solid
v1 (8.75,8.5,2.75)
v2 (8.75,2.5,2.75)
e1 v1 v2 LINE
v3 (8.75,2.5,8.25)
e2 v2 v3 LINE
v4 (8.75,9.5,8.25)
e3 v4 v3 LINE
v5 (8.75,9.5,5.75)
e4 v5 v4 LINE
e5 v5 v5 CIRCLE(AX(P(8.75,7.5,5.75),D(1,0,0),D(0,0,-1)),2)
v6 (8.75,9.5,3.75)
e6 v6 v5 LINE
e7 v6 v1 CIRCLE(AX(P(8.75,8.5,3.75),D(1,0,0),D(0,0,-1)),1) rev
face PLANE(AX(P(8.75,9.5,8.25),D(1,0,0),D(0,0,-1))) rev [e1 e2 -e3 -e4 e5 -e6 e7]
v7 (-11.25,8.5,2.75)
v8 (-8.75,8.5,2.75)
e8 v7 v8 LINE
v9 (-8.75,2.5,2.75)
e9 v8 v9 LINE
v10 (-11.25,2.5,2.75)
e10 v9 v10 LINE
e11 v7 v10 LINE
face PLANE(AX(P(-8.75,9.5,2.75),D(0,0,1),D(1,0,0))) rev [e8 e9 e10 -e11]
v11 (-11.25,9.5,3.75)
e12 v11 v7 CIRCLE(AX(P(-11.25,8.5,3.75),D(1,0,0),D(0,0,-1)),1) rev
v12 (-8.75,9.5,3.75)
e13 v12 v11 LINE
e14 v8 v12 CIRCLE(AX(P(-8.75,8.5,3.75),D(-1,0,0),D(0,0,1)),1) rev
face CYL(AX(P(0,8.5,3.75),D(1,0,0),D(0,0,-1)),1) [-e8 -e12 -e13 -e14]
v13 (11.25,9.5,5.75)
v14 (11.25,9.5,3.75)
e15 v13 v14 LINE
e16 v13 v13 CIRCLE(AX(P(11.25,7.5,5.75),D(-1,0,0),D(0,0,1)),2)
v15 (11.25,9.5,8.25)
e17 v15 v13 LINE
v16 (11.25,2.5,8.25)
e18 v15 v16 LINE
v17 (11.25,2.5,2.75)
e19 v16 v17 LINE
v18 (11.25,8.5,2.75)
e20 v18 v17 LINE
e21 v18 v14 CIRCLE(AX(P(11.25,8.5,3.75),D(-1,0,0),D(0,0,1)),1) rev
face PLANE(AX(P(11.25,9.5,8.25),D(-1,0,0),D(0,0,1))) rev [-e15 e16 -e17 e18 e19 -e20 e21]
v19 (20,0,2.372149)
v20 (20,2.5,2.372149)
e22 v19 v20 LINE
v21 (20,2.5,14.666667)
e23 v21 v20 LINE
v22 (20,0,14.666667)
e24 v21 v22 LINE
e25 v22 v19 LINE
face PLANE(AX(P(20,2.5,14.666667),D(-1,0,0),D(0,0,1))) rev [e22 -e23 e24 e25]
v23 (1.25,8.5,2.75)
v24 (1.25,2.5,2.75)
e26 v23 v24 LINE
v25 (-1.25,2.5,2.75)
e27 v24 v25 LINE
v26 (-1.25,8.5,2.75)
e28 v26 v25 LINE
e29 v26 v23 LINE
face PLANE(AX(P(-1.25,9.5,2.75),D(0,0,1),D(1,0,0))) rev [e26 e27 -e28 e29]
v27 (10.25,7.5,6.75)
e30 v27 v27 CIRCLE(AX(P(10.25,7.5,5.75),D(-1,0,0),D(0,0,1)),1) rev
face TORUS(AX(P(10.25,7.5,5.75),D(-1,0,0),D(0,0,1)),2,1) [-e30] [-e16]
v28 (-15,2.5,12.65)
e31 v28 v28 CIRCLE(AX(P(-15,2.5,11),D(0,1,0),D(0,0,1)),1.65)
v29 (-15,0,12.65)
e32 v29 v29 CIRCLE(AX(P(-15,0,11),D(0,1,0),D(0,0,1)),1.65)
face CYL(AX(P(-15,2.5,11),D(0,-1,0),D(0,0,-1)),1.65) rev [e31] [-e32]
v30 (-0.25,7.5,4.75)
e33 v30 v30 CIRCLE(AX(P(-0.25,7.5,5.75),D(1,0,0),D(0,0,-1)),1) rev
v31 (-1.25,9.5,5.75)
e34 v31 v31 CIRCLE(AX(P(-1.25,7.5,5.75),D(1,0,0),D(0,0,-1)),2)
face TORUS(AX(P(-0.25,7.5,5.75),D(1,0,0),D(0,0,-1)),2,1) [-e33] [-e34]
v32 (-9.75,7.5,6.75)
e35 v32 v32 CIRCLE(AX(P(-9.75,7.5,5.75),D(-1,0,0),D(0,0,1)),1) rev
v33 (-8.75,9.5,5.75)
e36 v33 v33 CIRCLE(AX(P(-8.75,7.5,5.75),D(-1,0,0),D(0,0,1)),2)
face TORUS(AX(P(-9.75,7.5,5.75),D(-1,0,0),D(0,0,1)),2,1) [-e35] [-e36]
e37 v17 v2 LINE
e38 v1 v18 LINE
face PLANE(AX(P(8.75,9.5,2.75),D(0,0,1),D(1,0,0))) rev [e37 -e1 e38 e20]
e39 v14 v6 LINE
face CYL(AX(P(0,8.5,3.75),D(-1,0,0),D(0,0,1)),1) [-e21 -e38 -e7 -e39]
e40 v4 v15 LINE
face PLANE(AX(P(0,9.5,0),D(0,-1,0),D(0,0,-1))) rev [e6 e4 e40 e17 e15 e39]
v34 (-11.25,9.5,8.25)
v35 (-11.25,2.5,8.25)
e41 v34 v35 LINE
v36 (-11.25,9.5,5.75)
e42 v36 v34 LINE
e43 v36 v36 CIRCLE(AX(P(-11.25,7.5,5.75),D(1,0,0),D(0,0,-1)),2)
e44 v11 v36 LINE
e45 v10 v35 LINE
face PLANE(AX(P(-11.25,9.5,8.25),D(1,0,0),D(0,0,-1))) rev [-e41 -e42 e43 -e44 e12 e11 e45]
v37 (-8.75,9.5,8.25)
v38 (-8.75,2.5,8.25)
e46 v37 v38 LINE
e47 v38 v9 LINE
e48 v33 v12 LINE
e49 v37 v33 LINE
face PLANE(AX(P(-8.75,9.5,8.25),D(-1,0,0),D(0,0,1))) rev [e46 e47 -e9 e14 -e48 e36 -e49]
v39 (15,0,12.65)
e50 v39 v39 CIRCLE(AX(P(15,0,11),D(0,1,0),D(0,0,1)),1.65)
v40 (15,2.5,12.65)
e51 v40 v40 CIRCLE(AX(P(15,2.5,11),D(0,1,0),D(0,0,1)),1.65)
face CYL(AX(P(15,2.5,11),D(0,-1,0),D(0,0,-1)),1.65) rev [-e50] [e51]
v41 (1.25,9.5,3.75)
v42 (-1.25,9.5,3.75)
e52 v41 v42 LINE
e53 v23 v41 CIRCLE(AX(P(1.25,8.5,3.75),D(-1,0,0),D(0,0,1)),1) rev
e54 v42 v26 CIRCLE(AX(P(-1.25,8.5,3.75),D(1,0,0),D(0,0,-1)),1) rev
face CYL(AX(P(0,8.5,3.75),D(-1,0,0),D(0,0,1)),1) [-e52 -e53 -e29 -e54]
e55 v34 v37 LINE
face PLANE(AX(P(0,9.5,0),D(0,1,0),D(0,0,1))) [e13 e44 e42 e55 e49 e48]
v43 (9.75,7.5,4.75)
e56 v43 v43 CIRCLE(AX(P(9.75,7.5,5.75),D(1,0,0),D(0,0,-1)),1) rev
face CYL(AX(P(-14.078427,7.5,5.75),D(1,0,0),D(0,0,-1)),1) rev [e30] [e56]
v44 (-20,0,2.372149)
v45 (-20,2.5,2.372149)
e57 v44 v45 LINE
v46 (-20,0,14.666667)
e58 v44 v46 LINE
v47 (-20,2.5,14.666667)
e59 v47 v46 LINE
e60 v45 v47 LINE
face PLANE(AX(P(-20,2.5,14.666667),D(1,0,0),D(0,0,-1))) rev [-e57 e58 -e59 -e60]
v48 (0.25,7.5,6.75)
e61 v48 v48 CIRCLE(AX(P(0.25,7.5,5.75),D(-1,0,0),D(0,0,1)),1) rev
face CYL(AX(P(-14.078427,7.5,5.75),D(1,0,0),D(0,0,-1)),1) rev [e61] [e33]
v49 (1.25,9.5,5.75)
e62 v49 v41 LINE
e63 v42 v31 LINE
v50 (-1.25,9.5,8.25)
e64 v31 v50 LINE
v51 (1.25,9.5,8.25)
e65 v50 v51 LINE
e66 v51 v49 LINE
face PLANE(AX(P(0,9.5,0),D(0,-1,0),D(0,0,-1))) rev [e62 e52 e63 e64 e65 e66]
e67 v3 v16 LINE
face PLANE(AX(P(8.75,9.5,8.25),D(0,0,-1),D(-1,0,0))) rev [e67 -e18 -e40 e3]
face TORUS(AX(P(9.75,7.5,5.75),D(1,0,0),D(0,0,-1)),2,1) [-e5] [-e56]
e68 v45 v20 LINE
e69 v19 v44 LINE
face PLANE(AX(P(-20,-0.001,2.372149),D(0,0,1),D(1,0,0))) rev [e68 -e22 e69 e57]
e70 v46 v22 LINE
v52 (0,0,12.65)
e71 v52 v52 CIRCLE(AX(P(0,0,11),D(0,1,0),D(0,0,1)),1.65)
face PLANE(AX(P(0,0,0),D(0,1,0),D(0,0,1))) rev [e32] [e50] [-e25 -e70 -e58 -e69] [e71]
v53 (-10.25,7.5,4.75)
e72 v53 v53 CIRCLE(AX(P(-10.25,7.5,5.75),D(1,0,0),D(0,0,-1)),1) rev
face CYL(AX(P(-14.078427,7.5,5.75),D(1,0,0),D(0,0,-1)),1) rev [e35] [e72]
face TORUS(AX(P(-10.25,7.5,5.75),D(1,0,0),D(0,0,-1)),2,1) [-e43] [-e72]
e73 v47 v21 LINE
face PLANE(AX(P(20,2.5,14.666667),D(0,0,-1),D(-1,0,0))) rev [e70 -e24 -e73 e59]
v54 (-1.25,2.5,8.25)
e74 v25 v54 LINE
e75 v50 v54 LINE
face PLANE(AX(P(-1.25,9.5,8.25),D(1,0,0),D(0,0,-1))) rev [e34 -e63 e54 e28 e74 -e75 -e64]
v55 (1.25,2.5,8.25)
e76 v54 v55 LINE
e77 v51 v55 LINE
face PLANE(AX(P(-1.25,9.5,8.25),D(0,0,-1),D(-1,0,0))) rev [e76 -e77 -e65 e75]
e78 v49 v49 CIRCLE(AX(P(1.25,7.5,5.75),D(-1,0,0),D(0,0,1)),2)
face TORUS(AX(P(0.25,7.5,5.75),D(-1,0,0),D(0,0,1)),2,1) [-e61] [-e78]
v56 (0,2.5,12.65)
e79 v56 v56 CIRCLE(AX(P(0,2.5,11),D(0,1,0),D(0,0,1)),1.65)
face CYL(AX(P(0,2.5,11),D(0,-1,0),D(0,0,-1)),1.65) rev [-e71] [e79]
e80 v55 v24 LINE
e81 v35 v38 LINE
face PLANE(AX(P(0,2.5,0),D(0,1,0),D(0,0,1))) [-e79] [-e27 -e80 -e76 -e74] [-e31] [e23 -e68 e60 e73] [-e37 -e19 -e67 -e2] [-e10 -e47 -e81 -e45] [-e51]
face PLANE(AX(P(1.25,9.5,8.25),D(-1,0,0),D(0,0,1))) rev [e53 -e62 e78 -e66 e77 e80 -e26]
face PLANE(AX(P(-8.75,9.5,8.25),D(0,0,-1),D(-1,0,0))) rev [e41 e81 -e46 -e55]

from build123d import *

# Parameters (mm, degrees)
SKETCH1_W           = 40
SKETCH1_H           = 29.333333334
SKETCH1_R           = 1.65
BOSS_EXTRUDE1_DEPTH = 2.5
SKETCH2_W           = 2.5
SKETCH2_H           = 5.5
BOSS_EXTRUDE2_DEPTH = 7
CUT_EXTRUDE1_REACH  = 37.804
SKETCH3_R           = 1
FILLET1_R           = 1
FILLET2_R           = 1
CUT_EXTRUDE2_REACH  = 27.77
SKETCH4_W           = 40
SKETCH4_H           = 17.038815724


with BuildPart() as part:
    # Sketch1 → Boss-Extrude1 (new body)
    with BuildSketch(Plane(origin=(0, 0, 0), x_dir=(1, 0, 0), z_dir=(0, 1, 0))):
        Rectangle(SKETCH1_W, SKETCH1_H)
        with Locations(Location((-15, 11, 0), (0, 0, 270))):
            Circle(SKETCH1_R, mode=Mode.SUBTRACT)
        with Locations(Location((0, 11, 0), (0, 0, 270))):
            Circle(SKETCH1_R, mode=Mode.SUBTRACT)
        with Locations(Location((15, 11, 0), (0, 0, 270))):
            Circle(SKETCH1_R, mode=Mode.SUBTRACT)
        with Locations(Location((0, 0, 0), (0, 0, 270))):
            Circle(SKETCH1_R, mode=Mode.SUBTRACT)
        with Locations(Location((15, 0, 0), (0, 0, 270))):
            Circle(SKETCH1_R, mode=Mode.SUBTRACT)
        with Locations(Location((0, -11, 0), (0, 0, 270))):
            Circle(SKETCH1_R, mode=Mode.SUBTRACT)
        with Locations(Location((15, -11, 0), (0, 0, 270))):
            Circle(SKETCH1_R, mode=Mode.SUBTRACT)
        with Locations(Location((-15, 0, 0), (0, 0, 270))):
            Circle(SKETCH1_R, mode=Mode.SUBTRACT)
        with Locations(Location((-15, -11, 0), (0, 0, 270))):
            Circle(SKETCH1_R, mode=Mode.SUBTRACT)
    extrude(amount=BOSS_EXTRUDE1_DEPTH)

    # Sketch2 → Boss-Extrude2 (add)
    with BuildSketch(Plane(origin=(0, 2.5, 0), x_dir=(1, 0, 0), z_dir=(0, 1, 0))):
        with Locations((10, -5.5)):
            Rectangle(SKETCH2_W, SKETCH2_H)
        with Locations((0, -5.5)):
            Rectangle(SKETCH2_W, SKETCH2_H)
        with Locations((-10, -5.5)):
            Rectangle(SKETCH2_W, SKETCH2_H)
    extrude(amount=BOSS_EXTRUDE2_DEPTH)

    # Cut-Extrude1: up to this face of the body (flat: up to its plane)
    cut_extrude1_end = Plane(part.part.faces().sort_by_distance((-11.25, 6, 5.5))[0])
    # Sketch3 → Cut-Extrude1 (cut, up to the picked face)
    with BuildSketch(Plane(origin=(11.25, 0, 0), x_dir=(0, 0, -1), z_dir=(1, 0, 0)), mode=Mode.PRIVATE) as cut_extrude1_sk1:
        with Locations((-5.75, 7.5)):
            Circle(SKETCH3_R)
    cut_extrude1_tool1 = split(extrude(cut_extrude1_sk1.sketch, amount=-CUT_EXTRUDE1_REACH, mode=Mode.PRIVATE), bisect_by=cut_extrude1_end, keep=Keep.BOTH, mode=Mode.PRIVATE)
    add(cut_extrude1_tool1.solids().sort_by(Axis((11.25, 7.5, 5.75), (-1, 0, 0)))[0], mode=Mode.SUBTRACT)

    # Fillet1
    fillet1_edges = [part.edges().sort_by_distance(p)[0] for p in [
        (-1.25, 7.5, 6.75),
        (1.25, 7.5, 6.75),
        (8.75, 7.5, 6.75),
        (-8.75, 7.5, 6.75),
        (11.25, 7.5, 6.75),
        (-11.25, 7.5, 6.75),
    ]]
    fillet(fillet1_edges, radius=FILLET1_R - 0.0001)  # a hair under: the kernel refuses the full size

    # Fillet2
    fillet2_edges = [part.edges().sort_by_distance(p)[0] for p in [
        (0, 9.5, 2.75),
        (10, 9.5, 2.75),
        (-10, 9.5, 2.75),
    ]]
    fillet(fillet2_edges, radius=FILLET2_R)

    # Sketch4 → Cut-Extrude2 (cut, up to next)
    with BuildSketch(Plane(origin=(0, 2.5, 0), x_dir=(1, 0, 0), z_dir=(0, 1, 0)), mode=Mode.PRIVATE) as cut_extrude2_sk1:
        with Locations((0, 6.147258805)):
            Rectangle(SKETCH4_W, SKETCH4_H)
    cut_extrude2_tool1 = extrude(cut_extrude2_sk1.sketch, amount=-CUT_EXTRUDE2_REACH, mode=Mode.PRIVATE) & part.part
    add(cut_extrude2_tool1.solids().sort_by_distance((0, 2.5, -6.147259))[0], mode=Mode.SUBTRACT)


solid = part.part
